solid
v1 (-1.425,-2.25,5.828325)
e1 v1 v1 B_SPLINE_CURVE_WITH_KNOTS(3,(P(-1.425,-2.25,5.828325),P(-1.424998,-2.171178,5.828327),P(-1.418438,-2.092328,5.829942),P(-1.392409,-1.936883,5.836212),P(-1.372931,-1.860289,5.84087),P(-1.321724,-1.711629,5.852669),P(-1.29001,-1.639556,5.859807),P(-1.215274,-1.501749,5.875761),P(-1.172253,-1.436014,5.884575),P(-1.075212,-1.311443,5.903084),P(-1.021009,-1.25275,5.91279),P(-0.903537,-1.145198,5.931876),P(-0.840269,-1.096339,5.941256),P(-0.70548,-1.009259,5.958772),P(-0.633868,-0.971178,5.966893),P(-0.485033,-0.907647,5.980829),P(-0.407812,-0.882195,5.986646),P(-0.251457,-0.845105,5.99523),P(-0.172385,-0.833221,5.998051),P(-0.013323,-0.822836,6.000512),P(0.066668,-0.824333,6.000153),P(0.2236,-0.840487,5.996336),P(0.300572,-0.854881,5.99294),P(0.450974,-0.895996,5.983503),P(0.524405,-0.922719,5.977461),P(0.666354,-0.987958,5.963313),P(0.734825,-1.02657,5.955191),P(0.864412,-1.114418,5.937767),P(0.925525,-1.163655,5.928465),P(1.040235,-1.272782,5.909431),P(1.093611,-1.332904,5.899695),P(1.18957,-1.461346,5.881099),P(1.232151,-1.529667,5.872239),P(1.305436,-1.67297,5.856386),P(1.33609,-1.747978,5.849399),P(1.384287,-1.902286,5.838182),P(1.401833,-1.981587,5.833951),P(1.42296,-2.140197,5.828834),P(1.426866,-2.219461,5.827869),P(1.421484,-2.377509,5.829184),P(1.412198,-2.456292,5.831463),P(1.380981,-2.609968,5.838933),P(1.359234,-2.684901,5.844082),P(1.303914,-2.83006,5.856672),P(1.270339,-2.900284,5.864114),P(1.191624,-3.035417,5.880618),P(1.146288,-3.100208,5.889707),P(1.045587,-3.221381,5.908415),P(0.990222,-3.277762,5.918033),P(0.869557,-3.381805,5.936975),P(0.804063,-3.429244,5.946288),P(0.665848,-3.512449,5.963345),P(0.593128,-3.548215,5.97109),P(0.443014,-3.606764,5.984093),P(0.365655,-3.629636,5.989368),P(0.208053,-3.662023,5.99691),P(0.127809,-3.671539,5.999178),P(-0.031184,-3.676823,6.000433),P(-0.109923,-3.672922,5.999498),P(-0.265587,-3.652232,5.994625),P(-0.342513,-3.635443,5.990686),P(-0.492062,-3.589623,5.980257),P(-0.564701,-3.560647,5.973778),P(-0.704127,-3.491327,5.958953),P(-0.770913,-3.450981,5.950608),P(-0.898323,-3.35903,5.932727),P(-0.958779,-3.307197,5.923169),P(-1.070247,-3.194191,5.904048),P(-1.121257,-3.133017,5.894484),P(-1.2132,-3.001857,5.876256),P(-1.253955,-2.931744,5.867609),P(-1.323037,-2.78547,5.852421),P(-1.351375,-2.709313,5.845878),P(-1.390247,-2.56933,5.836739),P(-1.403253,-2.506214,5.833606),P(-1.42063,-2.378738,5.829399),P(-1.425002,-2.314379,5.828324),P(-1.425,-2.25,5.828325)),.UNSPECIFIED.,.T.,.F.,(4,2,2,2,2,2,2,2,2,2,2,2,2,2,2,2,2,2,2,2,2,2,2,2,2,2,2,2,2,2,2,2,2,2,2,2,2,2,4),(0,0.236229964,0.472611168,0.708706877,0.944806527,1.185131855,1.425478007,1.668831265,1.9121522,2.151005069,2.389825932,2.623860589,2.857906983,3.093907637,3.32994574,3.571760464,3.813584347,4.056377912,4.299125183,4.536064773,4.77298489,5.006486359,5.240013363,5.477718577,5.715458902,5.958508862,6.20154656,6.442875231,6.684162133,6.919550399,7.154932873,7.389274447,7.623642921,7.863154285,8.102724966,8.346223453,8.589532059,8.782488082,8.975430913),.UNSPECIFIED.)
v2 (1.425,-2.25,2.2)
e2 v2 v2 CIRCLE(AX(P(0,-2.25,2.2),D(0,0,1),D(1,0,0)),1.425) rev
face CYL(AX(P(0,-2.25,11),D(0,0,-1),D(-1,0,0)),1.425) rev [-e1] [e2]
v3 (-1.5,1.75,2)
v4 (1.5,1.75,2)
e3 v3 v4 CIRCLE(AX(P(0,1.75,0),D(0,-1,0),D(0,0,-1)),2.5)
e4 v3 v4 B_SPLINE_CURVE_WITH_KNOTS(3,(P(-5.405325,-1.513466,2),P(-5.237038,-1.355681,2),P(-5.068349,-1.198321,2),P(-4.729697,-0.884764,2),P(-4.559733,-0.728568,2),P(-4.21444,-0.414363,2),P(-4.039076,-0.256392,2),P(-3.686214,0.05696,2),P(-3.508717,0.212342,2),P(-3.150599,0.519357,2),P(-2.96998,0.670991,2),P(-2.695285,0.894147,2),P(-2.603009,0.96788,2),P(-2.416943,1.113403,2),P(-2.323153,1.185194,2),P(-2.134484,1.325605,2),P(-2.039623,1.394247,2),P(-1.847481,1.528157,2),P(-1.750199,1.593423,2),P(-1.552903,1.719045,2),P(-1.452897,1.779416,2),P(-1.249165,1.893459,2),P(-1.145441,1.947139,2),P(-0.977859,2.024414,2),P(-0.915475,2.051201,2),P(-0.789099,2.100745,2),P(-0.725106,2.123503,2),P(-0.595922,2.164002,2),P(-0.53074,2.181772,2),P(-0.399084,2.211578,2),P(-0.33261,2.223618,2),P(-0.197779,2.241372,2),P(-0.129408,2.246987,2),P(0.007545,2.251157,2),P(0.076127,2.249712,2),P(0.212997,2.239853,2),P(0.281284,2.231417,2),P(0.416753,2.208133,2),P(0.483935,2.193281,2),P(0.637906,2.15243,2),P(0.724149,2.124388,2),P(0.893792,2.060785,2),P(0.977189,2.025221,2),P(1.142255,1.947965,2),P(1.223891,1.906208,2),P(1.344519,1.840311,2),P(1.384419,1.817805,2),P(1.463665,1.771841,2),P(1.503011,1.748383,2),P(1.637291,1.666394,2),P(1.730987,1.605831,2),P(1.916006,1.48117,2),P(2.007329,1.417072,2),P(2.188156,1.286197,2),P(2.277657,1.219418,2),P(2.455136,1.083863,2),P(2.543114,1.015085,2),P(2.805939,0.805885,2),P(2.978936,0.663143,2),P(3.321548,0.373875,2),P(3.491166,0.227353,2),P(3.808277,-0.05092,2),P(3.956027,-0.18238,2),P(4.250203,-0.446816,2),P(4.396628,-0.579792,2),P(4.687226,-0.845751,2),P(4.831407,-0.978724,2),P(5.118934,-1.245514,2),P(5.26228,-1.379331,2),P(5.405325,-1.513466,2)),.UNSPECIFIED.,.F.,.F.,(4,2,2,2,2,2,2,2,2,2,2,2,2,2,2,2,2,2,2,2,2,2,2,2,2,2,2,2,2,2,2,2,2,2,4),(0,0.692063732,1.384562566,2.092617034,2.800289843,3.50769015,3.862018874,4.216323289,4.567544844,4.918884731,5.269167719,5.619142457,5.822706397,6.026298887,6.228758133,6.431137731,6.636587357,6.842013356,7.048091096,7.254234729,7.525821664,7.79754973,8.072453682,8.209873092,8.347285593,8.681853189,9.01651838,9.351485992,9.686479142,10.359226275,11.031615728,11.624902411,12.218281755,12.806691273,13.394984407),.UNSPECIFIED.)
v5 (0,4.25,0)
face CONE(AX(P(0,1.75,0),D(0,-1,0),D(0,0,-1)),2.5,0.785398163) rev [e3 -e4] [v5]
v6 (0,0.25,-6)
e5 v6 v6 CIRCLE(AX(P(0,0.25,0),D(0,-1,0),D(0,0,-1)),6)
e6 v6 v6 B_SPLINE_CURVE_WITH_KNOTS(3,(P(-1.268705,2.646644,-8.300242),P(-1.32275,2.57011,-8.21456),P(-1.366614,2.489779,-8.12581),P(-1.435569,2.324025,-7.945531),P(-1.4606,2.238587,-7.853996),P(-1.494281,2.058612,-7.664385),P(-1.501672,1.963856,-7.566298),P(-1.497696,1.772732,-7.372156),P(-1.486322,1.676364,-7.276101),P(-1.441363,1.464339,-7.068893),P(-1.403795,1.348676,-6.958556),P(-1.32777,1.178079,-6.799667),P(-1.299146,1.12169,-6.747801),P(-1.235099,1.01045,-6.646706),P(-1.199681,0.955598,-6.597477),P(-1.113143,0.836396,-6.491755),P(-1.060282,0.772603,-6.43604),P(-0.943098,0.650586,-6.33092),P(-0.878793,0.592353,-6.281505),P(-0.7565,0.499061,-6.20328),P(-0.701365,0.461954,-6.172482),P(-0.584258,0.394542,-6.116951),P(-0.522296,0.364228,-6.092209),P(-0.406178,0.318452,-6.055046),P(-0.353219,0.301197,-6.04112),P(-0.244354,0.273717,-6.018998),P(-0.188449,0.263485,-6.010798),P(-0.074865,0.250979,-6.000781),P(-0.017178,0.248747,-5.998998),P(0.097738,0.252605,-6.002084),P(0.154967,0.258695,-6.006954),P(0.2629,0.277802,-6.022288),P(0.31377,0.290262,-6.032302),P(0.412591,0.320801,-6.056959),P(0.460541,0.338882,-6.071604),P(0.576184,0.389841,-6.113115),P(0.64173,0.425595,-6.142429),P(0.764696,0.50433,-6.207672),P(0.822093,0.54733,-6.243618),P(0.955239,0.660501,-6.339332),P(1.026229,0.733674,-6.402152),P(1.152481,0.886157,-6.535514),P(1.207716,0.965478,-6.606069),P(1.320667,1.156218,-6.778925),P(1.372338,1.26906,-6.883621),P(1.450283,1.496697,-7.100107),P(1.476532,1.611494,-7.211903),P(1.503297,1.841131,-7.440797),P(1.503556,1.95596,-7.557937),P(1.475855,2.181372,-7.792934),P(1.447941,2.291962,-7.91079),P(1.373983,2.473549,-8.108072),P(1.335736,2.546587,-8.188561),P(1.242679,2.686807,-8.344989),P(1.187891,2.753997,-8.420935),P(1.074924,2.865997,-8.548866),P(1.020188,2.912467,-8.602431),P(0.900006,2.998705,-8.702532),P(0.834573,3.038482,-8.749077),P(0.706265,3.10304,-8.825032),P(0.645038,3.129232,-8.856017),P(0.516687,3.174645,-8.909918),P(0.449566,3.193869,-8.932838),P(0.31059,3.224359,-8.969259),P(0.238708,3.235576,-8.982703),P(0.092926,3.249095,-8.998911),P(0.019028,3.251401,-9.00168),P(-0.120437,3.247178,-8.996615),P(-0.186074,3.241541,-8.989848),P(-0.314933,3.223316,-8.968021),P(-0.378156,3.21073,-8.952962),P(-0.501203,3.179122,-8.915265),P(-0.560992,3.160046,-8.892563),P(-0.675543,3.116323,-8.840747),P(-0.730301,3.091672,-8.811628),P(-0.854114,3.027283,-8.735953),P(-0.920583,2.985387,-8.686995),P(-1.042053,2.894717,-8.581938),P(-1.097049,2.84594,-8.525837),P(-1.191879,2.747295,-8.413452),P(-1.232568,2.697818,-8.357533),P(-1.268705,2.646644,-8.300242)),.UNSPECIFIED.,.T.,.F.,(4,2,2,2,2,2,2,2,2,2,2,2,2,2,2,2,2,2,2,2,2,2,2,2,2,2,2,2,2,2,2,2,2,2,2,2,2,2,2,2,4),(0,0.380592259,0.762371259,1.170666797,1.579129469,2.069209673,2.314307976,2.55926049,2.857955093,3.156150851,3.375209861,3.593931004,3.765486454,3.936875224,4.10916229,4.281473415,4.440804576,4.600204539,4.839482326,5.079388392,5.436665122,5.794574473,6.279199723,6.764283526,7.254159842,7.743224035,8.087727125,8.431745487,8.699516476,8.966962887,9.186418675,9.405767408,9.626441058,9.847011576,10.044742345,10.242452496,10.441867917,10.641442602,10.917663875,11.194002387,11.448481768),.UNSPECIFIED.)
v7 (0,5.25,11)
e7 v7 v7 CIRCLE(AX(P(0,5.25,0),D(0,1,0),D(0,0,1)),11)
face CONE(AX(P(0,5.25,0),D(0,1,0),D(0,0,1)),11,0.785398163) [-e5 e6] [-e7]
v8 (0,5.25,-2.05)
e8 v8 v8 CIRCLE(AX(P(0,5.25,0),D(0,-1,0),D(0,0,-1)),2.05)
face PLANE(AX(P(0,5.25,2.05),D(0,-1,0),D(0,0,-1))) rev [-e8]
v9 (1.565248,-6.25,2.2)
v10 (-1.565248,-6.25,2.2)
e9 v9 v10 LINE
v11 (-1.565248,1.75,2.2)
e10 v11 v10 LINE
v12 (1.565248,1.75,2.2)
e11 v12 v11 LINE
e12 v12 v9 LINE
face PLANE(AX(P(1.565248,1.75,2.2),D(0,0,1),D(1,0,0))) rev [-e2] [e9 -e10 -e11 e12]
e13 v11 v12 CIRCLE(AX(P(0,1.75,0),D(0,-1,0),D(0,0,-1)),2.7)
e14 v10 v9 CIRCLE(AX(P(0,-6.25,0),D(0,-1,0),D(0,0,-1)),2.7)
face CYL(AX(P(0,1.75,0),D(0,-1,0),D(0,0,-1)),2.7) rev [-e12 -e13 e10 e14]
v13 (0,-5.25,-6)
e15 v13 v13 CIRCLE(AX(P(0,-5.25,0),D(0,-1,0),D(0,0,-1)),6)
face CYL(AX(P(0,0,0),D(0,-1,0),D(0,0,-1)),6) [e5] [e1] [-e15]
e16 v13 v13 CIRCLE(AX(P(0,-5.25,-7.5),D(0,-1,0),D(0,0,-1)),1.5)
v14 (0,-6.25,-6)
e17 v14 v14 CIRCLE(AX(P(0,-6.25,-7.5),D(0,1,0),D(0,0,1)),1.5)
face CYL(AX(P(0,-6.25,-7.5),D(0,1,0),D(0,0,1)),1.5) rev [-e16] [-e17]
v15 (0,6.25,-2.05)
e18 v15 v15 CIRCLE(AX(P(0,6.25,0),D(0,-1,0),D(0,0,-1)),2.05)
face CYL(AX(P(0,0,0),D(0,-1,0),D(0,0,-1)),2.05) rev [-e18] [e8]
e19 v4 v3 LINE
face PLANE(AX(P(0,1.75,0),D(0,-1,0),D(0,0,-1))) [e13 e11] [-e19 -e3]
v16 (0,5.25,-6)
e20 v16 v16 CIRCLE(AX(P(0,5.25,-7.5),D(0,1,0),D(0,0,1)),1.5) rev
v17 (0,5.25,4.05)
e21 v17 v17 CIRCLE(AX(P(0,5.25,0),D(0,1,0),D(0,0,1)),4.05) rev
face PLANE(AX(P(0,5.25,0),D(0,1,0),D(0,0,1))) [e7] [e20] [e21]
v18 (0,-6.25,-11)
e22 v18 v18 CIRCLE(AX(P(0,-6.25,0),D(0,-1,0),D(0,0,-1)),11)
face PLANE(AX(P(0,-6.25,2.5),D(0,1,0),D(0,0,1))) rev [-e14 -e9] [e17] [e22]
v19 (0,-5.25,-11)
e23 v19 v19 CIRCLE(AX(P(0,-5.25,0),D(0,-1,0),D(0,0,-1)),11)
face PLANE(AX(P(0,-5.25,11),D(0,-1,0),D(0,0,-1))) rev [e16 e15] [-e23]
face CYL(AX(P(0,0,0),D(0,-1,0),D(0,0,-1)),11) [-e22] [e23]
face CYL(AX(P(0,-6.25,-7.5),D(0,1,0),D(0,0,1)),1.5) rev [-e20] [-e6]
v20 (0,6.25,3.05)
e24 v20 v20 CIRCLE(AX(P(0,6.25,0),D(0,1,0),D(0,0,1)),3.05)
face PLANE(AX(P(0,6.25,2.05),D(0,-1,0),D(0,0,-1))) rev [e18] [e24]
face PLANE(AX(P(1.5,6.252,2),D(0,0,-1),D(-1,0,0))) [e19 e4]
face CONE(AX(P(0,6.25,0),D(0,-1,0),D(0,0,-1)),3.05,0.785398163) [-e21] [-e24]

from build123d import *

# Parameters (mm, degrees)
FLATSPOT_EXTRUDE_REACH     = 21.956
WIRE_HOLE_CUT_DEPTH        = 20.345542122
WIRE_HOLE_CUT_DEPTH_BACK   = 20.345542122
SKETCH5_R                  = 1.5
SKETCH6_R                  = 1.425
SET_SCREW_CUT_DEPTH        = 19.1400801
MAGNET_START               = -1
SKETCH8_R                  = 11
SKETCH8_R_2                = 3.05
MAGNET_HOLDER_TRIM_DEPTH   = 1
MAGNET_HOLDER_CHAMFER_SIZE = 1
AXLE_TOLERANCE_CUT_DEPTH   = 8


with BuildPart() as part:
    # Sketch1 → Spool Solid (revolve)
    with BuildSketch(Plane(origin=(0, 0, 0), x_dir=(0, 0, -1), z_dir=(1, 0, 0)), mode=Mode.PRIVATE) as spool_solid_sk:
        Polygon((-11, 6.25), (-11, 5.25), (-6, 0.25), (-6, -5.25), (-11, -5.25), (-11, -6.25), (-2.5, -6.25), (-2.5, 1.75), (0, 4.25), (0, 5.25), (-2.05, 5.25), (-2.05, 6.25), (-2.5, 6.25), align=None)
    revolve(spool_solid_sk.sketch.rotate(Axis((0, 0, 0), (0, 1, 0)), 180), axis=Axis((0, 0, 0), (0, 1, 0)))

    # Flatspot Extrude: up to this cone (the profile starts inside it)
    flatspot_extrude_end = Plane(origin=(0, -6.25, 0), z_dir=(0, -1, 0)).offset(-10.499999) * Cone(1e-06, 43.456, 43.455999, align=(Align.CENTER, Align.CENTER, Align.MIN), mode=Mode.PRIVATE)
    # Sketch2 → Flatspot Extrude (add, up to the surface)
    with BuildSketch(Plane.XZ.offset(6.25), mode=Mode.PRIVATE) as flatspot_extrude_sk1:
        with BuildLine():
            Line((1.5, 2), (-1.5, 2))
            ThreePointArc((-1.5, 2), (0, 2.5), (1.5, 2))
        make_face()
    flatspot_extrude_tool1 = extrude(flatspot_extrude_sk1.sketch, amount=-FLATSPOT_EXTRUDE_REACH, mode=Mode.PRIVATE) & flatspot_extrude_end
    add(flatspot_extrude_tool1.solids().sort_by_distance((0, -6.25, 2.20182))[0])

    # Sketch5 → Wire Hole cut (cut, two sides: drawn at the far end of the back side and taken through both)
    with BuildSketch(Plane(origin=(0, -5.25, 0), x_dir=(1, 0, 0), z_dir=(0, 1, 0)).offset(-WIRE_HOLE_CUT_DEPTH_BACK)):
        with Locations(Location((0, 7.5, 0), (0, 0, 270))):
            Circle(SKETCH5_R)
    extrude(amount=WIRE_HOLE_CUT_DEPTH + WIRE_HOLE_CUT_DEPTH_BACK, mode=Mode.SUBTRACT)

    # Sketch6 → Set Screw Cut (cut, through all)
    with BuildSketch(Plane(origin=(0, 0, 2), x_dir=(-1, 0, 0), z_dir=(0, 0, -1))):
        with Locations((0, -2.25)):
            Circle(SKETCH6_R)
    extrude(amount=-SET_SCREW_CUT_DEPTH, mode=Mode.SUBTRACT)

    # Sketch8 → Magnet Holder Trim (cut)
    with BuildSketch(Plane(origin=(0, 6.25, 0), x_dir=(1, 0, 0), z_dir=(0, 1, 0)).offset(MAGNET_START)):
        with Locations(Location((0, 0, 0), (0, 0, 90))):
            Circle(SKETCH8_R)
        with Locations(Location((0, 0, 0), (0, 0, 270))):
            Circle(SKETCH8_R_2, mode=Mode.SUBTRACT)
    extrude(amount=MAGNET_HOLDER_TRIM_DEPTH, mode=Mode.SUBTRACT)

    # Magnet Holder Chamfer
    magnet_holder_chamfer_edges = [part.edges().sort_by_distance(p)[0] for p in [
        (0, 5.25, -3.05),
    ]]
    chamfer(magnet_holder_chamfer_edges, length=MAGNET_HOLDER_CHAMFER_SIZE - 0.0001)  # a hair under: the kernel refuses the full size

    # Sketch9 → Axle Tolerance Cut (cut)
    with BuildSketch(Plane.XZ.offset(6.25)):
        with BuildLine():
            Line((1.565247584, 2.2), (-1.565247584, 2.2))
            ThreePointArc((-1.565247584, 2.2), (0, -2.7), (1.565247584, 2.2))
        make_face()
    extrude(amount=-AXLE_TOLERANCE_CUT_DEPTH, mode=Mode.SUBTRACT)


solid = part.part
